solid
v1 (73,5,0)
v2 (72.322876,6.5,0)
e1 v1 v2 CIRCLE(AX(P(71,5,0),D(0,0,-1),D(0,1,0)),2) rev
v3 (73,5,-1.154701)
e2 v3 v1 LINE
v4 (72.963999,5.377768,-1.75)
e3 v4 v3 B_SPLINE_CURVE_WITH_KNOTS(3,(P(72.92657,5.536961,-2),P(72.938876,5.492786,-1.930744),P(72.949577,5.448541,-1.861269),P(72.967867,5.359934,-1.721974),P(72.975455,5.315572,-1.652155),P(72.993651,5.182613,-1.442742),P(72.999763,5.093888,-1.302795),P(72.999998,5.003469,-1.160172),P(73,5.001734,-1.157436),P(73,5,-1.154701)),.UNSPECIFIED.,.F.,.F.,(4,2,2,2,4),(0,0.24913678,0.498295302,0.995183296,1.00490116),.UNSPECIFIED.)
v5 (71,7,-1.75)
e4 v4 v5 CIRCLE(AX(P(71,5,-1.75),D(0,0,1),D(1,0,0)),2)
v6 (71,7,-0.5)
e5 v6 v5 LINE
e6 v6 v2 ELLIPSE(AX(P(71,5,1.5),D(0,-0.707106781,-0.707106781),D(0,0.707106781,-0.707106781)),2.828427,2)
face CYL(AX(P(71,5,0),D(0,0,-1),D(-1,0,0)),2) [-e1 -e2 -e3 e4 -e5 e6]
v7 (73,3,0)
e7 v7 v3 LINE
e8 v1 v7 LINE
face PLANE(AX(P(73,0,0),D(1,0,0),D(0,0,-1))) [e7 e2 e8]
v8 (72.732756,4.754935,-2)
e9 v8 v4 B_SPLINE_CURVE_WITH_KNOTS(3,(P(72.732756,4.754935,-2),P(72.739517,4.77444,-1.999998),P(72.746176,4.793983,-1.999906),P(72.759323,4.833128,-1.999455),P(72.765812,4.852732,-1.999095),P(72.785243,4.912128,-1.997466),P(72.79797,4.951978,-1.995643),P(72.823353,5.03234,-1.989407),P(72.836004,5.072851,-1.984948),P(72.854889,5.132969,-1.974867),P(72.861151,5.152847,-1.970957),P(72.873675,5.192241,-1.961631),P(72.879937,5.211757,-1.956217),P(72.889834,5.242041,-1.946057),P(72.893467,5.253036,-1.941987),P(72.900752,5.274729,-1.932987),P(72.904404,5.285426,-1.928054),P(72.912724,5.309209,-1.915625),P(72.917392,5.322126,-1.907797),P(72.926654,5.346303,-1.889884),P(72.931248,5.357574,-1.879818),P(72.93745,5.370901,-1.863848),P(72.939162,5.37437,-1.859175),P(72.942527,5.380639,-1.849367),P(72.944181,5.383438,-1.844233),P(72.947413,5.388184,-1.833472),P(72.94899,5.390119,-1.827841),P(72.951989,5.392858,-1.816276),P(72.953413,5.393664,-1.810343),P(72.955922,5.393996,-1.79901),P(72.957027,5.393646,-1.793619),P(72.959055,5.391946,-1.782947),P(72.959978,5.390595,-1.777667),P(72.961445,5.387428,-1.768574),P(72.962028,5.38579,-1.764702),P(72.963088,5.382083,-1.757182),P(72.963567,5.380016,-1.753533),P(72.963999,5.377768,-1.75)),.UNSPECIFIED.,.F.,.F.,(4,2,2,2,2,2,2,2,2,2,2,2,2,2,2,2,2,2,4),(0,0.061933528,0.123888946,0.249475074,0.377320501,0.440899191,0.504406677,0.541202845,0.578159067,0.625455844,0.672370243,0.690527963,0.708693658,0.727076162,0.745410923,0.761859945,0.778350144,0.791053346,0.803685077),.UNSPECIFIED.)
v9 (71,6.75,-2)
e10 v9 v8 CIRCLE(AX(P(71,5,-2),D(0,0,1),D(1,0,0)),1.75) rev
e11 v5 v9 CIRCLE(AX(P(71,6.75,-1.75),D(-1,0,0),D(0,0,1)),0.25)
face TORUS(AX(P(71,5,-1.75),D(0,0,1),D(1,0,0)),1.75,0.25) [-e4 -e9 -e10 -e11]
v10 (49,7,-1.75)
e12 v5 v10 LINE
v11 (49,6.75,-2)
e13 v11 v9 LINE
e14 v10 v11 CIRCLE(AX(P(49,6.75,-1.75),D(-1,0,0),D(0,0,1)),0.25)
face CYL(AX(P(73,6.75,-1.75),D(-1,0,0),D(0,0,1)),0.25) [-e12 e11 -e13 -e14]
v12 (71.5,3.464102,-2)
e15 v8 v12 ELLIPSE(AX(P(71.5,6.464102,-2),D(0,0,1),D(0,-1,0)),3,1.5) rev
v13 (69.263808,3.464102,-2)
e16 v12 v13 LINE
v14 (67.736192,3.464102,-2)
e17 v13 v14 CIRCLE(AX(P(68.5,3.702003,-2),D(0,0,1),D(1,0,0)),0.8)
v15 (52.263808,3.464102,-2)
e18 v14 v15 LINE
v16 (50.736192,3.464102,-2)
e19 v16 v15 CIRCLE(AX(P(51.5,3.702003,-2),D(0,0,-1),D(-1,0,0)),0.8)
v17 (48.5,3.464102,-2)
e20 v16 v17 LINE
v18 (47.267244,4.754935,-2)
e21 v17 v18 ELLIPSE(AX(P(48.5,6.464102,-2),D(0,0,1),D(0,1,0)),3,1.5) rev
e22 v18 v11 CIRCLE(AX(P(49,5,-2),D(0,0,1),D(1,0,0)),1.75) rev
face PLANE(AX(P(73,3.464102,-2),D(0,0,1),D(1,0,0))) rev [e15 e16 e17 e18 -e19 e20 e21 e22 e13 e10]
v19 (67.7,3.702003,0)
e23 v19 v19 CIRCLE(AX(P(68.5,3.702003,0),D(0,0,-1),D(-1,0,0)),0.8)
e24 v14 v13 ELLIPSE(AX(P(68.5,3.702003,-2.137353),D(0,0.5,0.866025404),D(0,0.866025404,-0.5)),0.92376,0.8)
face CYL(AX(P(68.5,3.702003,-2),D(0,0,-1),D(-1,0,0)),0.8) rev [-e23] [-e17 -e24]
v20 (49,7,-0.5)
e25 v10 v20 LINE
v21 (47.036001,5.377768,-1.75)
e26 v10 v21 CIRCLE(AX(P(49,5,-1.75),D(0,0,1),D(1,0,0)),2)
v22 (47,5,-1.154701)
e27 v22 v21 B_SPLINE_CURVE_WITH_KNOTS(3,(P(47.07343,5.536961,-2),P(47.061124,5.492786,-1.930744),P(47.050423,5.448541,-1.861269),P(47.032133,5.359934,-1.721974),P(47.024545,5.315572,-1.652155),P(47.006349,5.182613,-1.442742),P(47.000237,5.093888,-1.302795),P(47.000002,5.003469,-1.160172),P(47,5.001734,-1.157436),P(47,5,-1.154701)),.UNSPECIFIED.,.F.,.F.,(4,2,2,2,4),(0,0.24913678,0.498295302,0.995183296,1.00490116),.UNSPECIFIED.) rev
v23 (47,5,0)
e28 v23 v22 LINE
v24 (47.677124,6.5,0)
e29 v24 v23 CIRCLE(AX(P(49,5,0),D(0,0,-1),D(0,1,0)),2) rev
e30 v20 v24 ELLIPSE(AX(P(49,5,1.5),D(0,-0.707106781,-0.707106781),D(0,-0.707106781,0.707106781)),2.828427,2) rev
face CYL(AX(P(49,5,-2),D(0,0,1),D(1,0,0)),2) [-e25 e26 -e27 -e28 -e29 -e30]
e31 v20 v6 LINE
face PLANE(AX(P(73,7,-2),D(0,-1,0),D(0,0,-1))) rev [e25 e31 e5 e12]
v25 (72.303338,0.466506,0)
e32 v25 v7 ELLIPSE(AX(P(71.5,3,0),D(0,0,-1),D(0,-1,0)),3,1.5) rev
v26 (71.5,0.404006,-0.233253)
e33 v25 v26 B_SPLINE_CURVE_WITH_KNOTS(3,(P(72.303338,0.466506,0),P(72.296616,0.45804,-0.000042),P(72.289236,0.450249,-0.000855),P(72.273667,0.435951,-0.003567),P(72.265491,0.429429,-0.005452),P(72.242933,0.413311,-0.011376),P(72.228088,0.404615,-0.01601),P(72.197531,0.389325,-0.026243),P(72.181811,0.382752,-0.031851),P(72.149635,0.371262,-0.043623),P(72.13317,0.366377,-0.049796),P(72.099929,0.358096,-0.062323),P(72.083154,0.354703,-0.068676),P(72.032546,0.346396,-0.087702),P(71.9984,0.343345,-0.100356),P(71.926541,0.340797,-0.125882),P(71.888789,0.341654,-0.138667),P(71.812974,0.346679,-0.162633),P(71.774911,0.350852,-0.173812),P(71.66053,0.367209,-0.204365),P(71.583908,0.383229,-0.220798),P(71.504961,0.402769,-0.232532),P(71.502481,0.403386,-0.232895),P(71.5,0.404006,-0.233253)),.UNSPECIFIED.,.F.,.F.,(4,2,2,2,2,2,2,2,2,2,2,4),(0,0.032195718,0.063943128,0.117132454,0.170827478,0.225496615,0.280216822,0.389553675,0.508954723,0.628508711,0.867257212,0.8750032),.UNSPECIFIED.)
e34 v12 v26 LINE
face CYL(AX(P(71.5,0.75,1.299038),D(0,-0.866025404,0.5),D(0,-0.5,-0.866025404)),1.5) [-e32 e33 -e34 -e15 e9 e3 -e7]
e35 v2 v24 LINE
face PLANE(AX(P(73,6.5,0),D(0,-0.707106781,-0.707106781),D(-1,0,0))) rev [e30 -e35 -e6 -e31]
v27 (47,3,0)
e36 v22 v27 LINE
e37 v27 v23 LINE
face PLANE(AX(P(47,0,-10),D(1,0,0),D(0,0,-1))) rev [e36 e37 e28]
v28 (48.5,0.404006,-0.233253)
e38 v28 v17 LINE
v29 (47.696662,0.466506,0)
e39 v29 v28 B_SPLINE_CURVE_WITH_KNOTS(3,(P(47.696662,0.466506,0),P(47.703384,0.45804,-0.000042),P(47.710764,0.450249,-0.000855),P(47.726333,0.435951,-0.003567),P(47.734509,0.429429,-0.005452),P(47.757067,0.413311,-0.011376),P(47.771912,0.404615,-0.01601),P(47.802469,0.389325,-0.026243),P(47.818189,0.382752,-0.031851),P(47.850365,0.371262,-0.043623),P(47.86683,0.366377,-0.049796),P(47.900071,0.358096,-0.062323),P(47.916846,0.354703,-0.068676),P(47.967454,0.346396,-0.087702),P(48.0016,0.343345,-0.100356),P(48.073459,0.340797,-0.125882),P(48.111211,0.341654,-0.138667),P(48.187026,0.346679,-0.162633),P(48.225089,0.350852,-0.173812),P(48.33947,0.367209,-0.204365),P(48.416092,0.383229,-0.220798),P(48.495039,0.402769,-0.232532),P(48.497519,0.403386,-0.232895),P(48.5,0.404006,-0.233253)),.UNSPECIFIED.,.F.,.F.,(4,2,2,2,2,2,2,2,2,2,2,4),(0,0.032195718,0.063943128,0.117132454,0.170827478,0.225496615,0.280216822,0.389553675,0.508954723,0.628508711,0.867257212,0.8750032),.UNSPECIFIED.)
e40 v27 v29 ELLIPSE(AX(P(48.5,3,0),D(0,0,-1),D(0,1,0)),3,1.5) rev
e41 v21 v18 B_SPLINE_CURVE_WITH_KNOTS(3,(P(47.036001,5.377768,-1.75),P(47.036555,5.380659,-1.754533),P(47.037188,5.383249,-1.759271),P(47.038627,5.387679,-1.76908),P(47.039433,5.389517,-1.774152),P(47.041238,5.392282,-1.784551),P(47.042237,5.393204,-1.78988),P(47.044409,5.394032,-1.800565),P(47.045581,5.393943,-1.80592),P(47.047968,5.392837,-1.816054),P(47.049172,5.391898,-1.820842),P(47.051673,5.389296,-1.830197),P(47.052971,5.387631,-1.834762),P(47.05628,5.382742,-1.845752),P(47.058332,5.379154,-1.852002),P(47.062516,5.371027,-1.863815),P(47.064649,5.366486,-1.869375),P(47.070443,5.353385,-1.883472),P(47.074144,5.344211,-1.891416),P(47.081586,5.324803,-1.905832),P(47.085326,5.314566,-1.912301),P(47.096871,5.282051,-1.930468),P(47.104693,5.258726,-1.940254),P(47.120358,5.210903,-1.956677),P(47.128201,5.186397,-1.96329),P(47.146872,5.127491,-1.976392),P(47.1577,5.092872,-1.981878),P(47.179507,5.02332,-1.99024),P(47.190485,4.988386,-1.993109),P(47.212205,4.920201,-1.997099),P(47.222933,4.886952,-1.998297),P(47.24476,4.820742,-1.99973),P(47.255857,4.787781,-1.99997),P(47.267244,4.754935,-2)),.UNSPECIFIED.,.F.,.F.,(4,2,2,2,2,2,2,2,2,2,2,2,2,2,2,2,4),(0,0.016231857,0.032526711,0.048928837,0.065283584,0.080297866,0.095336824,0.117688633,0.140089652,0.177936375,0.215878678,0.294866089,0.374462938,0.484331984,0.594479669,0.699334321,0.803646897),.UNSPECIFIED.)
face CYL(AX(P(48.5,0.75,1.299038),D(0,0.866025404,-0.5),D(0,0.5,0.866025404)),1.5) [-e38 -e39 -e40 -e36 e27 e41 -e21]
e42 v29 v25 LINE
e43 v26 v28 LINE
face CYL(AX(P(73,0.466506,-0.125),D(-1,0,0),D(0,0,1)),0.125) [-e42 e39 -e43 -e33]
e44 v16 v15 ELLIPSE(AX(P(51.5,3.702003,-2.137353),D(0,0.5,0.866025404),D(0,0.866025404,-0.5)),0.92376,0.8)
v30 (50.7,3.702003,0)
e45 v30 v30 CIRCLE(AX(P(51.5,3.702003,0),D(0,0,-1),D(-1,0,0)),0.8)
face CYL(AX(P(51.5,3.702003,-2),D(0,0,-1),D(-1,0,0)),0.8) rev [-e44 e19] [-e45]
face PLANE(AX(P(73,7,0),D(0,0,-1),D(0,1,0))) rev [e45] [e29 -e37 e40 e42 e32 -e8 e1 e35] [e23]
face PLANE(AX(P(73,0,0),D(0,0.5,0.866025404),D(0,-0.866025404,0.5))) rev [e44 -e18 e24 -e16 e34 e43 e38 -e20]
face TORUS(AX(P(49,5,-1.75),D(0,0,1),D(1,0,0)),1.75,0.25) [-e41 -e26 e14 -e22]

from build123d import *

# Parameters (mm, degrees)
WEDGE_GENERAL_SHAPE_DEPTH      = 73
SIDE_FILLET_R                  = 1.5
CORNER_START                   = -3
CORNER_FILLET_DEPTH            = 4
KNIFE_EDGE_REMOVER_R           = 0.125
CARD_GUIDE_SIZE                = 0.5
SKETCH14_W                     = 47
SKETCH14_H                     = 7
BABY_WEDGE_SHORTENER_DEPTH     = 10
BABY_WEDGE_SIDE_FILLET_R       = 1.5
BABY_START                     = -3
BABY_WEDGE_CORNER_FILLET_DEPTH = 4
M2X0_4_TAPPED_HOLE2_D          = 1.6
BABY_BITE_FILLET_R             = 0.25


with BuildPart() as part:
    # Sketch2 → Wedge General Shape (new body)
    with BuildSketch(Plane(origin=(0, 0, 0), x_dir=(0, 0, -1), z_dir=(1, 0, 0))):
        Polygon((0, 7), (0, 0), (2, 3.464101615), (2, 7), align=None)
    extrude(amount=WEDGE_GENERAL_SHAPE_DEPTH)

    # Side Fillet
    side_fillet_edges = [part.edges().sort_by_distance(p)[0] for p in [
        (73, 1.732050808, -1),
        (0, 1.732050808, -1),
    ]]
    fillet(side_fillet_edges, radius=SIDE_FILLET_R)

    # Corner Fillet: read off the stored shape, not the designer's step
    # Corner Fillet outline → Corner Fillet (cut)
    with BuildSketch(Plane.XY.offset(CORNER_START)):
        with BuildLine():
            Line((73, 7), (71, 7))
            ThreePointArc((71, 7), (72.414213562, 6.414213562), (73, 5))
            Line((73, 5), (73, 7))
        make_face()
        with BuildLine():
            ThreePointArc((0, 5), (0.585786438, 6.414213562), (2, 7))
            Line((2, 7), (0, 7))
            Line((0, 7), (0, 5))
        make_face()
    extrude(amount=CORNER_FILLET_DEPTH, mode=Mode.SUBTRACT)

    # Knife Edge Remover
    # the kernel refuses this fillet: 0.125 mm, written as the material it takes off along each edge
    with BuildSketch(Plane(origin=(0.333734123, 0, 0), x_dir=(0, 1, 0), z_dir=(1, 0, 0))) as knife_edge_remover_piece_1:
        with BuildLine():
            CenterArc((KNIFE_EDGE_REMOVER_R * 3.73205080757, -KNIFE_EDGE_REMOVER_R), KNIFE_EDGE_REMOVER_R, 90, 150)
            Line((KNIFE_EDGE_REMOVER_R * 3.23205080757, -KNIFE_EDGE_REMOVER_R * 1.86602540378), (0, 0))
            Line((0, 0), (KNIFE_EDGE_REMOVER_R * 3.73205080757, 0))
        make_face()
    extrude(amount=72.332531755, mode=Mode.SUBTRACT)

    # Card Guide
    # the kernel refuses this chamfer: 0.5 mm, written as the material it takes off along each edge
    with BuildSketch(Plane(origin=(-0.18593054, 7, 0), x_dir=(0, -1, 0), z_dir=(1, 0, 0))) as card_guide_piece_1:
        Polygon((CARD_GUIDE_SIZE, 0), (0, CARD_GUIDE_SIZE), (0, 0), align=None)
    extrude(amount=73.37186108, mode=Mode.SUBTRACT)

    # Sketch14 → Baby Wedge Shortener (cut)
    with BuildSketch(Plane.XY):
        with Locations((23.5, 3.5)):
            Rectangle(SKETCH14_W, SKETCH14_H)
    extrude(amount=-BABY_WEDGE_SHORTENER_DEPTH, mode=Mode.SUBTRACT)

    # Baby Wedge Side Fillet
    # the kernel refuses this fillet: 1.5 mm, written as the material it takes off along each edge
    with BuildSketch(Plane(origin=(47, -2.843588913, 1.641746825), x_dir=(0, 0.49999999999999317, 0.8660254037844426), z_dir=(0, 0.8660254037844427, -0.4999999999999932))) as baby_wedge_side_fillet_piece_1:
        with BuildLine():
            CenterArc((BABY_WEDGE_SIDE_FILLET_R, BABY_WEDGE_SIDE_FILLET_R), BABY_WEDGE_SIDE_FILLET_R, 180, 90)
            Line((0, BABY_WEDGE_SIDE_FILLET_R), (0, 0))
            Line((0, 0), (BABY_WEDGE_SIDE_FILLET_R, 0))
        make_face()
    extrude(amount=11.033493649, mode=Mode.SUBTRACT)

    # Baby Wedge Corner Fillet: read off the stored shape, not the designer's step
    # Baby Wedge Corner Fillet outline → Baby Wedge Corner Fillet (cut)
    with BuildSketch(Plane.XY.offset(BABY_START)):
        with BuildLine():
            ThreePointArc((47, 5), (47.585786438, 6.414213562), (49, 7))
            Line((49, 7), (47, 7))
            Line((47, 7), (47, 5))
        make_face()
    extrude(amount=BABY_WEDGE_CORNER_FILLET_DEPTH, mode=Mode.SUBTRACT)

    # M2x0.4 Tapped Hole2 (through all)
    with Locations(Plane(origin=(0, 0, -2), x_dir=(-1, 0, 0), z_dir=(0, 0, -1))):
        with Locations((-68.5, 3.702003175), (-51.5, 3.702003175)):
            Hole(M2X0_4_TAPPED_HOLE2_D / 2)

    # Baby Bite Fillet
    baby_bite_fillet_edges = [part.edges().sort_by_distance(p)[0] for p in [
        (47.790438534, 6.592784059, -2),
        (72.209561466, 6.592784059, -2),
        (60, 7, -2),
    ]]
    fillet(baby_bite_fillet_edges, radius=BABY_BITE_FILLET_R)


solid = part.part
